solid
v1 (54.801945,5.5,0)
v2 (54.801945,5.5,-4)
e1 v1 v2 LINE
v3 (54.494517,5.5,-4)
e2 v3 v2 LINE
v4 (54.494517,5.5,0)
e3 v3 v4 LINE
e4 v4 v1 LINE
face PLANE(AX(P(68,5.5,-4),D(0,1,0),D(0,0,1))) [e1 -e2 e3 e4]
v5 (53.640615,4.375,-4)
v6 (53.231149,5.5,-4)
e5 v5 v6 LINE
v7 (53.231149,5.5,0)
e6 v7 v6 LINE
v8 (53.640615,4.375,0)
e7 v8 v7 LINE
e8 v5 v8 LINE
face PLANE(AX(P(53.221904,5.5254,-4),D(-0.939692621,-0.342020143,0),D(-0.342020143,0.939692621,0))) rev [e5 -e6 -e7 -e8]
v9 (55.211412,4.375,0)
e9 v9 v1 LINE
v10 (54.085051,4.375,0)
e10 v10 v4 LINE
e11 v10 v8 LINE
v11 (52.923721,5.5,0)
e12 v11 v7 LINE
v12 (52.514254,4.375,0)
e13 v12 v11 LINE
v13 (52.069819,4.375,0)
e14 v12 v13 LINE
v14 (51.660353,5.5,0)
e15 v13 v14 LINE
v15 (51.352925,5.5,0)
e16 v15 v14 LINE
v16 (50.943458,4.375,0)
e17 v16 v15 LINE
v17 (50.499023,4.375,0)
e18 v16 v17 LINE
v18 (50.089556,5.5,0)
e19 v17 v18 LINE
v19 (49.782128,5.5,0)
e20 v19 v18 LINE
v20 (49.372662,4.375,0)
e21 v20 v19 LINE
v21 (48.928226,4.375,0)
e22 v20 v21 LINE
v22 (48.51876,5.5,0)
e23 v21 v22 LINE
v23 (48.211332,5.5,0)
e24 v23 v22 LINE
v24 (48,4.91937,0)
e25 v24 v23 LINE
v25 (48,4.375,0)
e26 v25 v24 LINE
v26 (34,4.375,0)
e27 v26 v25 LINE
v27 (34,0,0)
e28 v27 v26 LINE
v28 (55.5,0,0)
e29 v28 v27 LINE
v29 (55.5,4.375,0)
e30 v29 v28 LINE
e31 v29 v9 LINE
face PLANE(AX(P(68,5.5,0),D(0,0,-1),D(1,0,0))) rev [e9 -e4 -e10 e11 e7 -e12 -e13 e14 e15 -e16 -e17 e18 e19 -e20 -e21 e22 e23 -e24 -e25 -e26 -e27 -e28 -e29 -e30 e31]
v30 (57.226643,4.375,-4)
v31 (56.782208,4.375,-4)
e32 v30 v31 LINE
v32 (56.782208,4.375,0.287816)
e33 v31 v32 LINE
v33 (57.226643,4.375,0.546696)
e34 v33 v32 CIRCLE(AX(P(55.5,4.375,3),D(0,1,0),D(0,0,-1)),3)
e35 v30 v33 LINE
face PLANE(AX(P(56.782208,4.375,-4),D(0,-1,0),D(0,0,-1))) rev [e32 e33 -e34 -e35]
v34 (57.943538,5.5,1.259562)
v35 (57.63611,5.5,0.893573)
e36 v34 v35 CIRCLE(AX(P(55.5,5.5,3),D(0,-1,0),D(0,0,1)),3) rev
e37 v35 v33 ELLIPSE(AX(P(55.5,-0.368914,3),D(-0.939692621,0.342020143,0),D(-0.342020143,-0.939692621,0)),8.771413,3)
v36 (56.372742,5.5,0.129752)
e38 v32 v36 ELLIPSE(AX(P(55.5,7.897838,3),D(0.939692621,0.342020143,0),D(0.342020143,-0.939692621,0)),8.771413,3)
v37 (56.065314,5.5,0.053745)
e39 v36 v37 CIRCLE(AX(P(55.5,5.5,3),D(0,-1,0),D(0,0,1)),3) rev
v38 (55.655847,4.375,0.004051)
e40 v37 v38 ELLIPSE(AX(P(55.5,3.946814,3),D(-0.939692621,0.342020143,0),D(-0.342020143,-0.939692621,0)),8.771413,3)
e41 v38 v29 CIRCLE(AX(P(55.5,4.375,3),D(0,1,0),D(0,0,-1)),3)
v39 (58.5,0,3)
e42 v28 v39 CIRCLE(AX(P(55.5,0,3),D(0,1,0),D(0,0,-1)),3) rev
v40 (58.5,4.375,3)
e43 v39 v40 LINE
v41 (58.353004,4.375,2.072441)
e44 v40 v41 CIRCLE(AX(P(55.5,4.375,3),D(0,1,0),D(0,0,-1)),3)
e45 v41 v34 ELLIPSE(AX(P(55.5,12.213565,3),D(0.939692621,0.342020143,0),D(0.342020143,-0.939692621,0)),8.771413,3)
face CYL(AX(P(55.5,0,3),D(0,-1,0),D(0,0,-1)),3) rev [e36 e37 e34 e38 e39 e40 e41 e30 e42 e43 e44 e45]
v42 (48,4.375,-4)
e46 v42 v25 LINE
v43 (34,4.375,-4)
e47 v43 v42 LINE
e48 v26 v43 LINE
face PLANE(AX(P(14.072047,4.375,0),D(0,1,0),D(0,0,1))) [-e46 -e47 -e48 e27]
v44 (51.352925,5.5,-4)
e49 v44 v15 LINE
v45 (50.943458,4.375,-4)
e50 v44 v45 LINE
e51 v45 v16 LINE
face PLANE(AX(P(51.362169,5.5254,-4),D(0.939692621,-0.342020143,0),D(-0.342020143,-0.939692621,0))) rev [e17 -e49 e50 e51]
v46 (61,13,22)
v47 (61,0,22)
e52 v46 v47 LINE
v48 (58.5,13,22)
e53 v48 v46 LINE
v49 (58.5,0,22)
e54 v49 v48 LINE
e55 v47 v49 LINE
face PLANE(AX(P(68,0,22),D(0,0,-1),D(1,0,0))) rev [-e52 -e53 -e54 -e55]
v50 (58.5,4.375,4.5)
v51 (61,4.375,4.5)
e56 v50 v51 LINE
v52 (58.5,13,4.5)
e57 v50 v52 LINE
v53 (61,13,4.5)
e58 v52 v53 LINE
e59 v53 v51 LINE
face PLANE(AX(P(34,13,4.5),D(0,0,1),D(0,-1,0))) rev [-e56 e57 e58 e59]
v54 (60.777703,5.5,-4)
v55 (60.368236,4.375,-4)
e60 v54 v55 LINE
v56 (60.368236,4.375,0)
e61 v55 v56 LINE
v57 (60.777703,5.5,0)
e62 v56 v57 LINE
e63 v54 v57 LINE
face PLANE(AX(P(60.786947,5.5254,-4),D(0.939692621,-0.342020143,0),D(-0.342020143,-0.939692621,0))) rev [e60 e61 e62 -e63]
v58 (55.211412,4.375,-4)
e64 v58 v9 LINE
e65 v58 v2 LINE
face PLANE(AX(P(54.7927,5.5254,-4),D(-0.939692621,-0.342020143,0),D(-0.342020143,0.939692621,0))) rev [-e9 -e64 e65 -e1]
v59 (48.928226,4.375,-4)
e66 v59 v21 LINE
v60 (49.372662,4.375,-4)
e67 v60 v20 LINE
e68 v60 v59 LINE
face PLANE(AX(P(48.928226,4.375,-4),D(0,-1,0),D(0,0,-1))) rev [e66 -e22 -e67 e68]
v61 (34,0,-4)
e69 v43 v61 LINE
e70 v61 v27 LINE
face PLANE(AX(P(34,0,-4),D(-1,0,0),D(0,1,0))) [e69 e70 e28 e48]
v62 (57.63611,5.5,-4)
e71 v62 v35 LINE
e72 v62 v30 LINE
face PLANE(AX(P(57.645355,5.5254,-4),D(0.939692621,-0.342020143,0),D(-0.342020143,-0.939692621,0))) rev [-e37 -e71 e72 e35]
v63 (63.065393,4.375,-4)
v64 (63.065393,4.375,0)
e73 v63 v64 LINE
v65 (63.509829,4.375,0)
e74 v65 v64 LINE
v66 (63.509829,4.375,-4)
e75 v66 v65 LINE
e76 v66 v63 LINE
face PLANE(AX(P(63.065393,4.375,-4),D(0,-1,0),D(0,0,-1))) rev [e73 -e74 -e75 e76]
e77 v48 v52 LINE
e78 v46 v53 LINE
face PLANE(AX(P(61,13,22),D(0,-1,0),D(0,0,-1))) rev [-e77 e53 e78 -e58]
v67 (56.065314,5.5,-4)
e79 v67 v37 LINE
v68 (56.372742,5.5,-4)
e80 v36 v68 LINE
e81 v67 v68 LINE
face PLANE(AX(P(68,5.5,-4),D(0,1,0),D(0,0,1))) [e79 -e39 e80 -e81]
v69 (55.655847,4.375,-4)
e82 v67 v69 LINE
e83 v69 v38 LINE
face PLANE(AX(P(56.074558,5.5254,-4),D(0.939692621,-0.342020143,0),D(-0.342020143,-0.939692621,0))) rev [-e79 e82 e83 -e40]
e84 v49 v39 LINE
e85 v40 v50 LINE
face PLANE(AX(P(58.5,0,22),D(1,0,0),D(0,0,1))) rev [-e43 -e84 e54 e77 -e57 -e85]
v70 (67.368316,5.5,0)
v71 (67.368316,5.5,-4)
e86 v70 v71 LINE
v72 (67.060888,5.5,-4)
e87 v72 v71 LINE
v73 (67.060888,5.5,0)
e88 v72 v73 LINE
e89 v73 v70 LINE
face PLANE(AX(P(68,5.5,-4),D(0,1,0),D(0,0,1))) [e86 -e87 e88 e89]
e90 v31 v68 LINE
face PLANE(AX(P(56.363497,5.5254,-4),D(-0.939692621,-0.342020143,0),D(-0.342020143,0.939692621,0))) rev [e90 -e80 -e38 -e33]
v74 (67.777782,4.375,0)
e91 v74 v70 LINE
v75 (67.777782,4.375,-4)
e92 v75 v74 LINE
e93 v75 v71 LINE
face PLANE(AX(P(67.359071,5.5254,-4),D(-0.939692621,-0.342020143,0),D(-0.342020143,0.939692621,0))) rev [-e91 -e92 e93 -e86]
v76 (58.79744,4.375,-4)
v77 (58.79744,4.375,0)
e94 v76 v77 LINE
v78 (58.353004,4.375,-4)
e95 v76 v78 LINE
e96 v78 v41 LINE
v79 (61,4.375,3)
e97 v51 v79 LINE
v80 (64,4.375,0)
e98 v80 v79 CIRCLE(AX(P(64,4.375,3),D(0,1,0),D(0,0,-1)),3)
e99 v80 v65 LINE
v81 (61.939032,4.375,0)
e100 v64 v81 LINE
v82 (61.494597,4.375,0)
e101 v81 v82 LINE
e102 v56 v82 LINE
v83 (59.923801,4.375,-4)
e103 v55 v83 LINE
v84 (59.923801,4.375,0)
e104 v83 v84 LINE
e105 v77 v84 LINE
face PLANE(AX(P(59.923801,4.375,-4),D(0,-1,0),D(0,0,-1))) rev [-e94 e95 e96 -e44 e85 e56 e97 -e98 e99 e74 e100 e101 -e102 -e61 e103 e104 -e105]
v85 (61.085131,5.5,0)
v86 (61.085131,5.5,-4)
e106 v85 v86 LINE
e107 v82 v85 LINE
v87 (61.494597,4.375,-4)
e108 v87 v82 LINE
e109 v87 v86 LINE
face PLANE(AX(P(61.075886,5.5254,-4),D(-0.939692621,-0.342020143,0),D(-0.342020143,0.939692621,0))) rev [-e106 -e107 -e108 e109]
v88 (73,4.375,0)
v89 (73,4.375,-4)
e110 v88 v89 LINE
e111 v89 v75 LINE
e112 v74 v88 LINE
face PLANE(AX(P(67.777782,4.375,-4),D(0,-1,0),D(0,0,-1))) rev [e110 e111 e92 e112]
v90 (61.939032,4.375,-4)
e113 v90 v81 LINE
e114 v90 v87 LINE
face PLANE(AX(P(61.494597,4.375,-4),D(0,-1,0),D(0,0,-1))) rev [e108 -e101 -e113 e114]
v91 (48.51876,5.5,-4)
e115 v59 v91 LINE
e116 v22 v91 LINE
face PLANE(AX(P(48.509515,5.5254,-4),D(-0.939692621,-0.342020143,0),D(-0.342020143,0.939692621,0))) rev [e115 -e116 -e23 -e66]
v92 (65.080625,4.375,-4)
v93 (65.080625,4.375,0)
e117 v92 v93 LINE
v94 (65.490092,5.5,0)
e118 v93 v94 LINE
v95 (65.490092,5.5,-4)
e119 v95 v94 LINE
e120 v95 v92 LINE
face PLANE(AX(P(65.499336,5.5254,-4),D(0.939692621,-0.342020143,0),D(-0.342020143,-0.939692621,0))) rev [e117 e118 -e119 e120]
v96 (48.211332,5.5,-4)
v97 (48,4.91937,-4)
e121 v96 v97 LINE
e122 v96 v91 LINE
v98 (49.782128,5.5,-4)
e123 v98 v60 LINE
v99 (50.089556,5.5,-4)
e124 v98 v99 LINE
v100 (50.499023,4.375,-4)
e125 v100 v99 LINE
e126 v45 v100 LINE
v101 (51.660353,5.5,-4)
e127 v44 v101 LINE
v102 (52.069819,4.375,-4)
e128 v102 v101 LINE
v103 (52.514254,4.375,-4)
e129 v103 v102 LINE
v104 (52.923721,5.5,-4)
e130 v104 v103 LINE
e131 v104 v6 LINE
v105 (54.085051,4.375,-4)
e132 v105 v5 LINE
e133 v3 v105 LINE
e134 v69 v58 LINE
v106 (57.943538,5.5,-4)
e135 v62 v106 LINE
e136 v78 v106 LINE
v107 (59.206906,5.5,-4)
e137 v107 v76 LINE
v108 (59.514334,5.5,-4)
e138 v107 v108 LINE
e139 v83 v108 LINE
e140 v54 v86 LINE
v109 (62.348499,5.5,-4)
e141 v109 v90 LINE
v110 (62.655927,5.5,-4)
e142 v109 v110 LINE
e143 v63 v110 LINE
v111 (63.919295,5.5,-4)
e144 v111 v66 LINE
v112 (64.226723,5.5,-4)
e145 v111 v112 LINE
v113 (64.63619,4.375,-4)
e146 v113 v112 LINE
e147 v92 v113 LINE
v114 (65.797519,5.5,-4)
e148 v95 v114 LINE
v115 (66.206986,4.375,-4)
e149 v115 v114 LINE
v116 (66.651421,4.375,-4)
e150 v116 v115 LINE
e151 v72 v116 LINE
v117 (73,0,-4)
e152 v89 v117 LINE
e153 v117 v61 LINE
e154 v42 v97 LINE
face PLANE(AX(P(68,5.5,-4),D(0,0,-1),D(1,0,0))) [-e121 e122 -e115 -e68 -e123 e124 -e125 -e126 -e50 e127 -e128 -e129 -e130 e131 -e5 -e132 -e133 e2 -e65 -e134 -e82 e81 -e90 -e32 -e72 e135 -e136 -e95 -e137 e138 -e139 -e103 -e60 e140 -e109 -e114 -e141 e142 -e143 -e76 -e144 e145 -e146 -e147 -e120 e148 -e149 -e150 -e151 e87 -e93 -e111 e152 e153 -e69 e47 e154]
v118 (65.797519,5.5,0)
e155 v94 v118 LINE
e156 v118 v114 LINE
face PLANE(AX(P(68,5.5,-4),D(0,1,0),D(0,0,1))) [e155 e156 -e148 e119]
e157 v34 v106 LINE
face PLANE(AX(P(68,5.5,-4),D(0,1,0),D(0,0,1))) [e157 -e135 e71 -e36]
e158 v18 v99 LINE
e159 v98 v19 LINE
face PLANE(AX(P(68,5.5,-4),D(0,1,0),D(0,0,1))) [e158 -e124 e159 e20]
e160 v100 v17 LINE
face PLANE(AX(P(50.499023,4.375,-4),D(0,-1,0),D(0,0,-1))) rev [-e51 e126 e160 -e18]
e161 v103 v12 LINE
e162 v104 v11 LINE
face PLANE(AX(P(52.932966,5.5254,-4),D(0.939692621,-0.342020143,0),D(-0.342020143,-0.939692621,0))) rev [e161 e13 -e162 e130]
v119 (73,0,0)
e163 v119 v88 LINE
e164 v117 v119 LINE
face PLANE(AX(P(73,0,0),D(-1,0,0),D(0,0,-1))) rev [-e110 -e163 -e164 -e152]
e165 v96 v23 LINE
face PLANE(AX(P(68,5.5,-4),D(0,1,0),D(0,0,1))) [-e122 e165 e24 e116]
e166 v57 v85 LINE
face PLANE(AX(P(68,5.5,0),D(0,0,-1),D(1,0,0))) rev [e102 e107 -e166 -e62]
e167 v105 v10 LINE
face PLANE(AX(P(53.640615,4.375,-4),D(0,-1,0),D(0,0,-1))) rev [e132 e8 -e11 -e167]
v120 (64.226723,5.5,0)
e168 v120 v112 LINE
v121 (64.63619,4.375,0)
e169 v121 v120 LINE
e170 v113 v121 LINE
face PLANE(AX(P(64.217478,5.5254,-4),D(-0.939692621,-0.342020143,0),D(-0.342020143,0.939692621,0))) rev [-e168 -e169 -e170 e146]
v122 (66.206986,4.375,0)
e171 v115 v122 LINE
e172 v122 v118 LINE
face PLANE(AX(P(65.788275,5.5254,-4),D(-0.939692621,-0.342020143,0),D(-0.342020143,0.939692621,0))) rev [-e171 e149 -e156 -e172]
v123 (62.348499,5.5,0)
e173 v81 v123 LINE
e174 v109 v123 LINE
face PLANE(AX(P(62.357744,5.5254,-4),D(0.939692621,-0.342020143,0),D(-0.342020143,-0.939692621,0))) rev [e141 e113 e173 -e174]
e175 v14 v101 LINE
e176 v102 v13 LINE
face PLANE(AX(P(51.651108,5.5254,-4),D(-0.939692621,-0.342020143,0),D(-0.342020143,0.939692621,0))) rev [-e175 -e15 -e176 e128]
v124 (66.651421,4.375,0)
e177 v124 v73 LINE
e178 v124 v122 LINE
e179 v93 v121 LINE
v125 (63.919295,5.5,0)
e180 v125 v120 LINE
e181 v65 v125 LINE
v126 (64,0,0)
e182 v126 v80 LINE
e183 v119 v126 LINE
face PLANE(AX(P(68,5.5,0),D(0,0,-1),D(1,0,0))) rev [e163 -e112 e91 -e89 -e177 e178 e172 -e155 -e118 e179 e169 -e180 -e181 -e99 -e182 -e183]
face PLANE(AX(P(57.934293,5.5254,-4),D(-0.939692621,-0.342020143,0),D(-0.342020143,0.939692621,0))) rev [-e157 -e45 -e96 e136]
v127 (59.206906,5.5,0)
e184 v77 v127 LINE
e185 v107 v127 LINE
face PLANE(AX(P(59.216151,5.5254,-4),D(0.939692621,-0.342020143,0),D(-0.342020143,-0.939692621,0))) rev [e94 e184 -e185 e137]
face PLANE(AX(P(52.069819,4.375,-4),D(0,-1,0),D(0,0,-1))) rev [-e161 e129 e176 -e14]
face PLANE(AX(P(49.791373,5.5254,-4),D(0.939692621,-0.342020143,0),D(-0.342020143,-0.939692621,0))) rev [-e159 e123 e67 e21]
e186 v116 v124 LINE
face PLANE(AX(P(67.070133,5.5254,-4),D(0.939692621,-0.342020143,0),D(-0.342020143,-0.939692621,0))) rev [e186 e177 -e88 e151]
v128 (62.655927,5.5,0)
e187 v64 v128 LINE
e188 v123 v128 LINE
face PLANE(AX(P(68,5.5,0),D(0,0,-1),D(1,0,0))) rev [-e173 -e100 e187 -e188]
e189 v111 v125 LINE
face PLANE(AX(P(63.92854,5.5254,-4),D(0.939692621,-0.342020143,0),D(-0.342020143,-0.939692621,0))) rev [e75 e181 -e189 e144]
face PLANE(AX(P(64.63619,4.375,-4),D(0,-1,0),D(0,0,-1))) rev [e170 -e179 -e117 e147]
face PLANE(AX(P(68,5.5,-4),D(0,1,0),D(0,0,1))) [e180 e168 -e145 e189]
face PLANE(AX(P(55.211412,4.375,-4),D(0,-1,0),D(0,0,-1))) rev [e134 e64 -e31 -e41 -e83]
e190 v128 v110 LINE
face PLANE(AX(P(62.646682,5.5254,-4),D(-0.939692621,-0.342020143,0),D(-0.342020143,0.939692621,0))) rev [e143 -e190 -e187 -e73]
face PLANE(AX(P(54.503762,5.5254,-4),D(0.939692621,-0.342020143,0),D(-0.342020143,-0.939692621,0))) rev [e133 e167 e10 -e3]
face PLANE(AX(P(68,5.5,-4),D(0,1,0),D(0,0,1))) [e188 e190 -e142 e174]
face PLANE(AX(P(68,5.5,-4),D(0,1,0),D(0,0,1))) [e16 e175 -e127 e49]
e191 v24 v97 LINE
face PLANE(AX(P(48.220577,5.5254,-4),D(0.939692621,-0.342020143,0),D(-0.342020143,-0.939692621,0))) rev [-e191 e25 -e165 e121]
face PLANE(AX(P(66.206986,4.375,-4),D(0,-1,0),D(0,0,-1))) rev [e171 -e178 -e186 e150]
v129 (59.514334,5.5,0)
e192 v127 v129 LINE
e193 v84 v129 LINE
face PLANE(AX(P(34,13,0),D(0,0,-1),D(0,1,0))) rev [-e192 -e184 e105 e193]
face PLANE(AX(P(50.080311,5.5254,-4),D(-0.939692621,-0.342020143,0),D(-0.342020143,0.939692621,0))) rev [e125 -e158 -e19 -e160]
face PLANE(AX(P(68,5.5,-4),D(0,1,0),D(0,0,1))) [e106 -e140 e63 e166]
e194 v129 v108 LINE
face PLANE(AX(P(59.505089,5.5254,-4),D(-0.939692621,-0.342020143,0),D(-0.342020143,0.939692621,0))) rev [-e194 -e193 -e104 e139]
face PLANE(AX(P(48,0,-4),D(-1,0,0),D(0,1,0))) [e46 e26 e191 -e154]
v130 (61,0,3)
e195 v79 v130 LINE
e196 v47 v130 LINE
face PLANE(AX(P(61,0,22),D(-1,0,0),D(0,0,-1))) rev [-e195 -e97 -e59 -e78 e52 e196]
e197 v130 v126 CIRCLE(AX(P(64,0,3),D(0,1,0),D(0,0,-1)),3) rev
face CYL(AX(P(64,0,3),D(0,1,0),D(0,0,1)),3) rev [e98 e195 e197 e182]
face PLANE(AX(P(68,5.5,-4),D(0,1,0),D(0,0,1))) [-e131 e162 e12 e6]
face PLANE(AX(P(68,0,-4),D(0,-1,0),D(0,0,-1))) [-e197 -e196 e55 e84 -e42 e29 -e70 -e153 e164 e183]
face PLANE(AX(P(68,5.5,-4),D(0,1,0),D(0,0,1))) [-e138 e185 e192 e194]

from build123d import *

# Parameters (mm, degrees)
BLANKSKE_W               = 20
BLANKSKE_H               = 5.5
BLANK_DEPTH              = 4
TOOTHCUTSIM_DEPTH        = 22.124630174
TEETHCUTS_COUNT          = 14
TEETHCUTS_PITCH          = 1.570796325
SKETCH1_W                = 2.5
SKETCH1_H                = 13
BOSS_EXTRUDE1_DEPTH      = 22
BOSS_EXTRUDE3_DEPTH      = 5
BOSS_EXTRUDE3_DEPTH_BACK = 34
SKETCH3_W                = 4
SKETCH3_H                = 4.375
CUT_EXTRUDE1_DEPTH       = 38.175260591
CUT_EXTRUDE1_DEPTH_BACK  = 38.175260591
SKETCH4_W                = 4.5
SKETCH4_H                = 8.625
FILLET1_R                = 3


with BuildPart() as part:
    # BlankSke → Blank (new body)
    with BuildSketch(Plane.XY):
        with Locations((10, 2.75)):
            Rectangle(BLANKSKE_W, BLANKSKE_H)
    extrude(amount=-BLANK_DEPTH)

    # TooCutSkeSim → ToothCutSim (cut, through all)
    with BuildSketch(Plane.XY):
        Polygon((0.222217685, 4.375), (-0.222217685, 4.375), (-0.640929042, 5.5254), (0.640929042, 5.5254), align=None)
    toothcutsim = extrude(amount=-TOOTHCUTSIM_DEPTH, mode=Mode.SUBTRACT)

    # TeethCuts: ToothCutSim ×14
    with Locations(*[(i * TEETHCUTS_PITCH, 0, 0) for i in range(1, TEETHCUTS_COUNT)]):
        add(toothcutsim, mode=Mode.SUBTRACT)

    # Sketch1 → Boss-Extrude1 (add)
    with BuildSketch(Plane.XY):
        with Locations((8.25, 6.5)):
            Rectangle(SKETCH1_W, SKETCH1_H)
    extrude(amount=BOSS_EXTRUDE1_DEPTH)

    # Sketch3 → Boss-Extrude3 (add, two sides: drawn at the far end of the back side and taken through both)
    with BuildSketch(Plane.ZY.offset(-BOSS_EXTRUDE3_DEPTH_BACK)):
        with Locations((-2, 2.1875)):
            Rectangle(SKETCH3_W, SKETCH3_H)
    extrude(amount=BOSS_EXTRUDE3_DEPTH + BOSS_EXTRUDE3_DEPTH_BACK)

    # Sketch4 → Cut-Extrude1 (cut, two sides: drawn at the far end of the back side and taken through both)
    with BuildSketch(Plane.ZY.offset(-7).offset(-CUT_EXTRUDE1_DEPTH_BACK)):
        with Locations((2.25, 8.6875)):
            Rectangle(SKETCH4_W, SKETCH4_H)
    extrude(amount=CUT_EXTRUDE1_DEPTH + CUT_EXTRUDE1_DEPTH_BACK, mode=Mode.SUBTRACT)

    # Fillet1
    # the kernel refuses this fillet: 3 mm, written as the material it adds along each edge
    with BuildSketch(Plane(origin=(7, 0, 0), x_dir=(0, 0, 1), z_dir=(0, 1, 0))) as fillet1_piece_1:
        with BuildLine():
            CenterArc((FILLET1_R, -FILLET1_R), FILLET1_R, 90, 90)
            Line((0, -FILLET1_R), (0, 0))
            Line((0, 0), (FILLET1_R, 0))
        make_face()
    extrude(amount=4.375)
    with BuildSketch(Plane(origin=(9.5, 0, 0), x_dir=(0, 0, 1), z_dir=(0, 1, 0))) as fillet1_piece_2:
        with BuildLine():
            CenterArc((FILLET1_R, FILLET1_R), FILLET1_R, 180, 90)
            Line((0, FILLET1_R), (0, 0))
            Line((0, 0), (FILLET1_R, 0))
        make_face()
    extrude(amount=4.375)
    with BuildSketch(Plane(origin=(9.5, -7.5, 0), x_dir=(0, 0, 1), z_dir=(0, 1, 0))) as fillet1_piece_3_section:
        with BuildLine():
            CenterArc((FILLET1_R, FILLET1_R), FILLET1_R, 180, 90)
            Line((0, FILLET1_R), (0, 0))
            Line((0, 0), (FILLET1_R, 0))
        make_face()
    fillet1_piece_3 = extrude(amount=19.375, mode=Mode.PRIVATE)
    fillet1_piece_3 = split(fillet1_piece_3, bisect_by=Plane(origin=(11.636487366, 4.375, 0.067590567), z_dir=(0, 1, 0)), keep=Keep.TOP, mode=Mode.PRIVATE)
    fillet1_piece_3 = split(fillet1_piece_3, bisect_by=Plane(origin=(11.636487366, 5.5, 0.067590567), z_dir=(0, -1, 0)), keep=Keep.TOP, mode=Mode.PRIVATE)
    fillet1_piece_3 = split(fillet1_piece_3, bisect_by=Plane(origin=(11.407964632, 4.897495122, 0.067590567), z_dir=(0.9396926207859105, -0.3420201433256629, 0)), keep=Keep.TOP, mode=Mode.PRIVATE)
    fillet1_piece_3 = split(fillet1_piece_3, bisect_by=Plane(origin=(12.120177158, 4.990368336, 0.067590567), z_dir=(-0.9396926207859105, -0.3420201433256629, 0)), keep=Keep.TOP, mode=Mode.PRIVATE)
    add(fillet1_piece_3)
    with BuildSketch(Plane(origin=(9.5, -7.5, 0), x_dir=(0, 0, 1), z_dir=(0, 1, 0))) as fillet1_piece_4_section:
        with BuildLine():
            CenterArc((FILLET1_R, FILLET1_R), FILLET1_R, 180, 90)
            Line((0, FILLET1_R), (0, 0))
            Line((0, 0), (FILLET1_R, 0))
        make_face()
    fillet1_piece_4 = extrude(amount=19.375, mode=Mode.PRIVATE)
    fillet1_piece_4 = split(fillet1_piece_4, bisect_by=Plane(origin=(10.146205087, 4.375, 0.590480104), z_dir=(0, 1, 0)), keep=Keep.TOP, mode=Mode.PRIVATE)
    fillet1_piece_4 = split(fillet1_piece_4, bisect_by=Plane(origin=(9.84999644, 4.932740127, 0.590480104), z_dir=(0.9396926207859105, -0.3420201433256629, 0)), keep=Keep.TOP, mode=Mode.PRIVATE)
    fillet1_piece_4 = split(fillet1_piece_4, bisect_by=Plane(origin=(10.146205087, 5.5, 0.590480104), z_dir=(0, -1, 0)), keep=Keep.TOP, mode=Mode.PRIVATE)
    fillet1_piece_4 = split(fillet1_piece_4, bisect_by=Plane(origin=(10.555389409, 4.97385991, 0.590480104), z_dir=(-0.9396926207859105, -0.3420201433256629, 0)), keep=Keep.TOP, mode=Mode.PRIVATE)
    add(fillet1_piece_4)


with BuildPart() as body_2:
    # Mirror1: mirrored copy
    add(part.part.mirror(Plane(origin=(34, 0, -4), x_dir=(0, 0, 1), z_dir=(1, 0, 0))))


solid = body_2.part
